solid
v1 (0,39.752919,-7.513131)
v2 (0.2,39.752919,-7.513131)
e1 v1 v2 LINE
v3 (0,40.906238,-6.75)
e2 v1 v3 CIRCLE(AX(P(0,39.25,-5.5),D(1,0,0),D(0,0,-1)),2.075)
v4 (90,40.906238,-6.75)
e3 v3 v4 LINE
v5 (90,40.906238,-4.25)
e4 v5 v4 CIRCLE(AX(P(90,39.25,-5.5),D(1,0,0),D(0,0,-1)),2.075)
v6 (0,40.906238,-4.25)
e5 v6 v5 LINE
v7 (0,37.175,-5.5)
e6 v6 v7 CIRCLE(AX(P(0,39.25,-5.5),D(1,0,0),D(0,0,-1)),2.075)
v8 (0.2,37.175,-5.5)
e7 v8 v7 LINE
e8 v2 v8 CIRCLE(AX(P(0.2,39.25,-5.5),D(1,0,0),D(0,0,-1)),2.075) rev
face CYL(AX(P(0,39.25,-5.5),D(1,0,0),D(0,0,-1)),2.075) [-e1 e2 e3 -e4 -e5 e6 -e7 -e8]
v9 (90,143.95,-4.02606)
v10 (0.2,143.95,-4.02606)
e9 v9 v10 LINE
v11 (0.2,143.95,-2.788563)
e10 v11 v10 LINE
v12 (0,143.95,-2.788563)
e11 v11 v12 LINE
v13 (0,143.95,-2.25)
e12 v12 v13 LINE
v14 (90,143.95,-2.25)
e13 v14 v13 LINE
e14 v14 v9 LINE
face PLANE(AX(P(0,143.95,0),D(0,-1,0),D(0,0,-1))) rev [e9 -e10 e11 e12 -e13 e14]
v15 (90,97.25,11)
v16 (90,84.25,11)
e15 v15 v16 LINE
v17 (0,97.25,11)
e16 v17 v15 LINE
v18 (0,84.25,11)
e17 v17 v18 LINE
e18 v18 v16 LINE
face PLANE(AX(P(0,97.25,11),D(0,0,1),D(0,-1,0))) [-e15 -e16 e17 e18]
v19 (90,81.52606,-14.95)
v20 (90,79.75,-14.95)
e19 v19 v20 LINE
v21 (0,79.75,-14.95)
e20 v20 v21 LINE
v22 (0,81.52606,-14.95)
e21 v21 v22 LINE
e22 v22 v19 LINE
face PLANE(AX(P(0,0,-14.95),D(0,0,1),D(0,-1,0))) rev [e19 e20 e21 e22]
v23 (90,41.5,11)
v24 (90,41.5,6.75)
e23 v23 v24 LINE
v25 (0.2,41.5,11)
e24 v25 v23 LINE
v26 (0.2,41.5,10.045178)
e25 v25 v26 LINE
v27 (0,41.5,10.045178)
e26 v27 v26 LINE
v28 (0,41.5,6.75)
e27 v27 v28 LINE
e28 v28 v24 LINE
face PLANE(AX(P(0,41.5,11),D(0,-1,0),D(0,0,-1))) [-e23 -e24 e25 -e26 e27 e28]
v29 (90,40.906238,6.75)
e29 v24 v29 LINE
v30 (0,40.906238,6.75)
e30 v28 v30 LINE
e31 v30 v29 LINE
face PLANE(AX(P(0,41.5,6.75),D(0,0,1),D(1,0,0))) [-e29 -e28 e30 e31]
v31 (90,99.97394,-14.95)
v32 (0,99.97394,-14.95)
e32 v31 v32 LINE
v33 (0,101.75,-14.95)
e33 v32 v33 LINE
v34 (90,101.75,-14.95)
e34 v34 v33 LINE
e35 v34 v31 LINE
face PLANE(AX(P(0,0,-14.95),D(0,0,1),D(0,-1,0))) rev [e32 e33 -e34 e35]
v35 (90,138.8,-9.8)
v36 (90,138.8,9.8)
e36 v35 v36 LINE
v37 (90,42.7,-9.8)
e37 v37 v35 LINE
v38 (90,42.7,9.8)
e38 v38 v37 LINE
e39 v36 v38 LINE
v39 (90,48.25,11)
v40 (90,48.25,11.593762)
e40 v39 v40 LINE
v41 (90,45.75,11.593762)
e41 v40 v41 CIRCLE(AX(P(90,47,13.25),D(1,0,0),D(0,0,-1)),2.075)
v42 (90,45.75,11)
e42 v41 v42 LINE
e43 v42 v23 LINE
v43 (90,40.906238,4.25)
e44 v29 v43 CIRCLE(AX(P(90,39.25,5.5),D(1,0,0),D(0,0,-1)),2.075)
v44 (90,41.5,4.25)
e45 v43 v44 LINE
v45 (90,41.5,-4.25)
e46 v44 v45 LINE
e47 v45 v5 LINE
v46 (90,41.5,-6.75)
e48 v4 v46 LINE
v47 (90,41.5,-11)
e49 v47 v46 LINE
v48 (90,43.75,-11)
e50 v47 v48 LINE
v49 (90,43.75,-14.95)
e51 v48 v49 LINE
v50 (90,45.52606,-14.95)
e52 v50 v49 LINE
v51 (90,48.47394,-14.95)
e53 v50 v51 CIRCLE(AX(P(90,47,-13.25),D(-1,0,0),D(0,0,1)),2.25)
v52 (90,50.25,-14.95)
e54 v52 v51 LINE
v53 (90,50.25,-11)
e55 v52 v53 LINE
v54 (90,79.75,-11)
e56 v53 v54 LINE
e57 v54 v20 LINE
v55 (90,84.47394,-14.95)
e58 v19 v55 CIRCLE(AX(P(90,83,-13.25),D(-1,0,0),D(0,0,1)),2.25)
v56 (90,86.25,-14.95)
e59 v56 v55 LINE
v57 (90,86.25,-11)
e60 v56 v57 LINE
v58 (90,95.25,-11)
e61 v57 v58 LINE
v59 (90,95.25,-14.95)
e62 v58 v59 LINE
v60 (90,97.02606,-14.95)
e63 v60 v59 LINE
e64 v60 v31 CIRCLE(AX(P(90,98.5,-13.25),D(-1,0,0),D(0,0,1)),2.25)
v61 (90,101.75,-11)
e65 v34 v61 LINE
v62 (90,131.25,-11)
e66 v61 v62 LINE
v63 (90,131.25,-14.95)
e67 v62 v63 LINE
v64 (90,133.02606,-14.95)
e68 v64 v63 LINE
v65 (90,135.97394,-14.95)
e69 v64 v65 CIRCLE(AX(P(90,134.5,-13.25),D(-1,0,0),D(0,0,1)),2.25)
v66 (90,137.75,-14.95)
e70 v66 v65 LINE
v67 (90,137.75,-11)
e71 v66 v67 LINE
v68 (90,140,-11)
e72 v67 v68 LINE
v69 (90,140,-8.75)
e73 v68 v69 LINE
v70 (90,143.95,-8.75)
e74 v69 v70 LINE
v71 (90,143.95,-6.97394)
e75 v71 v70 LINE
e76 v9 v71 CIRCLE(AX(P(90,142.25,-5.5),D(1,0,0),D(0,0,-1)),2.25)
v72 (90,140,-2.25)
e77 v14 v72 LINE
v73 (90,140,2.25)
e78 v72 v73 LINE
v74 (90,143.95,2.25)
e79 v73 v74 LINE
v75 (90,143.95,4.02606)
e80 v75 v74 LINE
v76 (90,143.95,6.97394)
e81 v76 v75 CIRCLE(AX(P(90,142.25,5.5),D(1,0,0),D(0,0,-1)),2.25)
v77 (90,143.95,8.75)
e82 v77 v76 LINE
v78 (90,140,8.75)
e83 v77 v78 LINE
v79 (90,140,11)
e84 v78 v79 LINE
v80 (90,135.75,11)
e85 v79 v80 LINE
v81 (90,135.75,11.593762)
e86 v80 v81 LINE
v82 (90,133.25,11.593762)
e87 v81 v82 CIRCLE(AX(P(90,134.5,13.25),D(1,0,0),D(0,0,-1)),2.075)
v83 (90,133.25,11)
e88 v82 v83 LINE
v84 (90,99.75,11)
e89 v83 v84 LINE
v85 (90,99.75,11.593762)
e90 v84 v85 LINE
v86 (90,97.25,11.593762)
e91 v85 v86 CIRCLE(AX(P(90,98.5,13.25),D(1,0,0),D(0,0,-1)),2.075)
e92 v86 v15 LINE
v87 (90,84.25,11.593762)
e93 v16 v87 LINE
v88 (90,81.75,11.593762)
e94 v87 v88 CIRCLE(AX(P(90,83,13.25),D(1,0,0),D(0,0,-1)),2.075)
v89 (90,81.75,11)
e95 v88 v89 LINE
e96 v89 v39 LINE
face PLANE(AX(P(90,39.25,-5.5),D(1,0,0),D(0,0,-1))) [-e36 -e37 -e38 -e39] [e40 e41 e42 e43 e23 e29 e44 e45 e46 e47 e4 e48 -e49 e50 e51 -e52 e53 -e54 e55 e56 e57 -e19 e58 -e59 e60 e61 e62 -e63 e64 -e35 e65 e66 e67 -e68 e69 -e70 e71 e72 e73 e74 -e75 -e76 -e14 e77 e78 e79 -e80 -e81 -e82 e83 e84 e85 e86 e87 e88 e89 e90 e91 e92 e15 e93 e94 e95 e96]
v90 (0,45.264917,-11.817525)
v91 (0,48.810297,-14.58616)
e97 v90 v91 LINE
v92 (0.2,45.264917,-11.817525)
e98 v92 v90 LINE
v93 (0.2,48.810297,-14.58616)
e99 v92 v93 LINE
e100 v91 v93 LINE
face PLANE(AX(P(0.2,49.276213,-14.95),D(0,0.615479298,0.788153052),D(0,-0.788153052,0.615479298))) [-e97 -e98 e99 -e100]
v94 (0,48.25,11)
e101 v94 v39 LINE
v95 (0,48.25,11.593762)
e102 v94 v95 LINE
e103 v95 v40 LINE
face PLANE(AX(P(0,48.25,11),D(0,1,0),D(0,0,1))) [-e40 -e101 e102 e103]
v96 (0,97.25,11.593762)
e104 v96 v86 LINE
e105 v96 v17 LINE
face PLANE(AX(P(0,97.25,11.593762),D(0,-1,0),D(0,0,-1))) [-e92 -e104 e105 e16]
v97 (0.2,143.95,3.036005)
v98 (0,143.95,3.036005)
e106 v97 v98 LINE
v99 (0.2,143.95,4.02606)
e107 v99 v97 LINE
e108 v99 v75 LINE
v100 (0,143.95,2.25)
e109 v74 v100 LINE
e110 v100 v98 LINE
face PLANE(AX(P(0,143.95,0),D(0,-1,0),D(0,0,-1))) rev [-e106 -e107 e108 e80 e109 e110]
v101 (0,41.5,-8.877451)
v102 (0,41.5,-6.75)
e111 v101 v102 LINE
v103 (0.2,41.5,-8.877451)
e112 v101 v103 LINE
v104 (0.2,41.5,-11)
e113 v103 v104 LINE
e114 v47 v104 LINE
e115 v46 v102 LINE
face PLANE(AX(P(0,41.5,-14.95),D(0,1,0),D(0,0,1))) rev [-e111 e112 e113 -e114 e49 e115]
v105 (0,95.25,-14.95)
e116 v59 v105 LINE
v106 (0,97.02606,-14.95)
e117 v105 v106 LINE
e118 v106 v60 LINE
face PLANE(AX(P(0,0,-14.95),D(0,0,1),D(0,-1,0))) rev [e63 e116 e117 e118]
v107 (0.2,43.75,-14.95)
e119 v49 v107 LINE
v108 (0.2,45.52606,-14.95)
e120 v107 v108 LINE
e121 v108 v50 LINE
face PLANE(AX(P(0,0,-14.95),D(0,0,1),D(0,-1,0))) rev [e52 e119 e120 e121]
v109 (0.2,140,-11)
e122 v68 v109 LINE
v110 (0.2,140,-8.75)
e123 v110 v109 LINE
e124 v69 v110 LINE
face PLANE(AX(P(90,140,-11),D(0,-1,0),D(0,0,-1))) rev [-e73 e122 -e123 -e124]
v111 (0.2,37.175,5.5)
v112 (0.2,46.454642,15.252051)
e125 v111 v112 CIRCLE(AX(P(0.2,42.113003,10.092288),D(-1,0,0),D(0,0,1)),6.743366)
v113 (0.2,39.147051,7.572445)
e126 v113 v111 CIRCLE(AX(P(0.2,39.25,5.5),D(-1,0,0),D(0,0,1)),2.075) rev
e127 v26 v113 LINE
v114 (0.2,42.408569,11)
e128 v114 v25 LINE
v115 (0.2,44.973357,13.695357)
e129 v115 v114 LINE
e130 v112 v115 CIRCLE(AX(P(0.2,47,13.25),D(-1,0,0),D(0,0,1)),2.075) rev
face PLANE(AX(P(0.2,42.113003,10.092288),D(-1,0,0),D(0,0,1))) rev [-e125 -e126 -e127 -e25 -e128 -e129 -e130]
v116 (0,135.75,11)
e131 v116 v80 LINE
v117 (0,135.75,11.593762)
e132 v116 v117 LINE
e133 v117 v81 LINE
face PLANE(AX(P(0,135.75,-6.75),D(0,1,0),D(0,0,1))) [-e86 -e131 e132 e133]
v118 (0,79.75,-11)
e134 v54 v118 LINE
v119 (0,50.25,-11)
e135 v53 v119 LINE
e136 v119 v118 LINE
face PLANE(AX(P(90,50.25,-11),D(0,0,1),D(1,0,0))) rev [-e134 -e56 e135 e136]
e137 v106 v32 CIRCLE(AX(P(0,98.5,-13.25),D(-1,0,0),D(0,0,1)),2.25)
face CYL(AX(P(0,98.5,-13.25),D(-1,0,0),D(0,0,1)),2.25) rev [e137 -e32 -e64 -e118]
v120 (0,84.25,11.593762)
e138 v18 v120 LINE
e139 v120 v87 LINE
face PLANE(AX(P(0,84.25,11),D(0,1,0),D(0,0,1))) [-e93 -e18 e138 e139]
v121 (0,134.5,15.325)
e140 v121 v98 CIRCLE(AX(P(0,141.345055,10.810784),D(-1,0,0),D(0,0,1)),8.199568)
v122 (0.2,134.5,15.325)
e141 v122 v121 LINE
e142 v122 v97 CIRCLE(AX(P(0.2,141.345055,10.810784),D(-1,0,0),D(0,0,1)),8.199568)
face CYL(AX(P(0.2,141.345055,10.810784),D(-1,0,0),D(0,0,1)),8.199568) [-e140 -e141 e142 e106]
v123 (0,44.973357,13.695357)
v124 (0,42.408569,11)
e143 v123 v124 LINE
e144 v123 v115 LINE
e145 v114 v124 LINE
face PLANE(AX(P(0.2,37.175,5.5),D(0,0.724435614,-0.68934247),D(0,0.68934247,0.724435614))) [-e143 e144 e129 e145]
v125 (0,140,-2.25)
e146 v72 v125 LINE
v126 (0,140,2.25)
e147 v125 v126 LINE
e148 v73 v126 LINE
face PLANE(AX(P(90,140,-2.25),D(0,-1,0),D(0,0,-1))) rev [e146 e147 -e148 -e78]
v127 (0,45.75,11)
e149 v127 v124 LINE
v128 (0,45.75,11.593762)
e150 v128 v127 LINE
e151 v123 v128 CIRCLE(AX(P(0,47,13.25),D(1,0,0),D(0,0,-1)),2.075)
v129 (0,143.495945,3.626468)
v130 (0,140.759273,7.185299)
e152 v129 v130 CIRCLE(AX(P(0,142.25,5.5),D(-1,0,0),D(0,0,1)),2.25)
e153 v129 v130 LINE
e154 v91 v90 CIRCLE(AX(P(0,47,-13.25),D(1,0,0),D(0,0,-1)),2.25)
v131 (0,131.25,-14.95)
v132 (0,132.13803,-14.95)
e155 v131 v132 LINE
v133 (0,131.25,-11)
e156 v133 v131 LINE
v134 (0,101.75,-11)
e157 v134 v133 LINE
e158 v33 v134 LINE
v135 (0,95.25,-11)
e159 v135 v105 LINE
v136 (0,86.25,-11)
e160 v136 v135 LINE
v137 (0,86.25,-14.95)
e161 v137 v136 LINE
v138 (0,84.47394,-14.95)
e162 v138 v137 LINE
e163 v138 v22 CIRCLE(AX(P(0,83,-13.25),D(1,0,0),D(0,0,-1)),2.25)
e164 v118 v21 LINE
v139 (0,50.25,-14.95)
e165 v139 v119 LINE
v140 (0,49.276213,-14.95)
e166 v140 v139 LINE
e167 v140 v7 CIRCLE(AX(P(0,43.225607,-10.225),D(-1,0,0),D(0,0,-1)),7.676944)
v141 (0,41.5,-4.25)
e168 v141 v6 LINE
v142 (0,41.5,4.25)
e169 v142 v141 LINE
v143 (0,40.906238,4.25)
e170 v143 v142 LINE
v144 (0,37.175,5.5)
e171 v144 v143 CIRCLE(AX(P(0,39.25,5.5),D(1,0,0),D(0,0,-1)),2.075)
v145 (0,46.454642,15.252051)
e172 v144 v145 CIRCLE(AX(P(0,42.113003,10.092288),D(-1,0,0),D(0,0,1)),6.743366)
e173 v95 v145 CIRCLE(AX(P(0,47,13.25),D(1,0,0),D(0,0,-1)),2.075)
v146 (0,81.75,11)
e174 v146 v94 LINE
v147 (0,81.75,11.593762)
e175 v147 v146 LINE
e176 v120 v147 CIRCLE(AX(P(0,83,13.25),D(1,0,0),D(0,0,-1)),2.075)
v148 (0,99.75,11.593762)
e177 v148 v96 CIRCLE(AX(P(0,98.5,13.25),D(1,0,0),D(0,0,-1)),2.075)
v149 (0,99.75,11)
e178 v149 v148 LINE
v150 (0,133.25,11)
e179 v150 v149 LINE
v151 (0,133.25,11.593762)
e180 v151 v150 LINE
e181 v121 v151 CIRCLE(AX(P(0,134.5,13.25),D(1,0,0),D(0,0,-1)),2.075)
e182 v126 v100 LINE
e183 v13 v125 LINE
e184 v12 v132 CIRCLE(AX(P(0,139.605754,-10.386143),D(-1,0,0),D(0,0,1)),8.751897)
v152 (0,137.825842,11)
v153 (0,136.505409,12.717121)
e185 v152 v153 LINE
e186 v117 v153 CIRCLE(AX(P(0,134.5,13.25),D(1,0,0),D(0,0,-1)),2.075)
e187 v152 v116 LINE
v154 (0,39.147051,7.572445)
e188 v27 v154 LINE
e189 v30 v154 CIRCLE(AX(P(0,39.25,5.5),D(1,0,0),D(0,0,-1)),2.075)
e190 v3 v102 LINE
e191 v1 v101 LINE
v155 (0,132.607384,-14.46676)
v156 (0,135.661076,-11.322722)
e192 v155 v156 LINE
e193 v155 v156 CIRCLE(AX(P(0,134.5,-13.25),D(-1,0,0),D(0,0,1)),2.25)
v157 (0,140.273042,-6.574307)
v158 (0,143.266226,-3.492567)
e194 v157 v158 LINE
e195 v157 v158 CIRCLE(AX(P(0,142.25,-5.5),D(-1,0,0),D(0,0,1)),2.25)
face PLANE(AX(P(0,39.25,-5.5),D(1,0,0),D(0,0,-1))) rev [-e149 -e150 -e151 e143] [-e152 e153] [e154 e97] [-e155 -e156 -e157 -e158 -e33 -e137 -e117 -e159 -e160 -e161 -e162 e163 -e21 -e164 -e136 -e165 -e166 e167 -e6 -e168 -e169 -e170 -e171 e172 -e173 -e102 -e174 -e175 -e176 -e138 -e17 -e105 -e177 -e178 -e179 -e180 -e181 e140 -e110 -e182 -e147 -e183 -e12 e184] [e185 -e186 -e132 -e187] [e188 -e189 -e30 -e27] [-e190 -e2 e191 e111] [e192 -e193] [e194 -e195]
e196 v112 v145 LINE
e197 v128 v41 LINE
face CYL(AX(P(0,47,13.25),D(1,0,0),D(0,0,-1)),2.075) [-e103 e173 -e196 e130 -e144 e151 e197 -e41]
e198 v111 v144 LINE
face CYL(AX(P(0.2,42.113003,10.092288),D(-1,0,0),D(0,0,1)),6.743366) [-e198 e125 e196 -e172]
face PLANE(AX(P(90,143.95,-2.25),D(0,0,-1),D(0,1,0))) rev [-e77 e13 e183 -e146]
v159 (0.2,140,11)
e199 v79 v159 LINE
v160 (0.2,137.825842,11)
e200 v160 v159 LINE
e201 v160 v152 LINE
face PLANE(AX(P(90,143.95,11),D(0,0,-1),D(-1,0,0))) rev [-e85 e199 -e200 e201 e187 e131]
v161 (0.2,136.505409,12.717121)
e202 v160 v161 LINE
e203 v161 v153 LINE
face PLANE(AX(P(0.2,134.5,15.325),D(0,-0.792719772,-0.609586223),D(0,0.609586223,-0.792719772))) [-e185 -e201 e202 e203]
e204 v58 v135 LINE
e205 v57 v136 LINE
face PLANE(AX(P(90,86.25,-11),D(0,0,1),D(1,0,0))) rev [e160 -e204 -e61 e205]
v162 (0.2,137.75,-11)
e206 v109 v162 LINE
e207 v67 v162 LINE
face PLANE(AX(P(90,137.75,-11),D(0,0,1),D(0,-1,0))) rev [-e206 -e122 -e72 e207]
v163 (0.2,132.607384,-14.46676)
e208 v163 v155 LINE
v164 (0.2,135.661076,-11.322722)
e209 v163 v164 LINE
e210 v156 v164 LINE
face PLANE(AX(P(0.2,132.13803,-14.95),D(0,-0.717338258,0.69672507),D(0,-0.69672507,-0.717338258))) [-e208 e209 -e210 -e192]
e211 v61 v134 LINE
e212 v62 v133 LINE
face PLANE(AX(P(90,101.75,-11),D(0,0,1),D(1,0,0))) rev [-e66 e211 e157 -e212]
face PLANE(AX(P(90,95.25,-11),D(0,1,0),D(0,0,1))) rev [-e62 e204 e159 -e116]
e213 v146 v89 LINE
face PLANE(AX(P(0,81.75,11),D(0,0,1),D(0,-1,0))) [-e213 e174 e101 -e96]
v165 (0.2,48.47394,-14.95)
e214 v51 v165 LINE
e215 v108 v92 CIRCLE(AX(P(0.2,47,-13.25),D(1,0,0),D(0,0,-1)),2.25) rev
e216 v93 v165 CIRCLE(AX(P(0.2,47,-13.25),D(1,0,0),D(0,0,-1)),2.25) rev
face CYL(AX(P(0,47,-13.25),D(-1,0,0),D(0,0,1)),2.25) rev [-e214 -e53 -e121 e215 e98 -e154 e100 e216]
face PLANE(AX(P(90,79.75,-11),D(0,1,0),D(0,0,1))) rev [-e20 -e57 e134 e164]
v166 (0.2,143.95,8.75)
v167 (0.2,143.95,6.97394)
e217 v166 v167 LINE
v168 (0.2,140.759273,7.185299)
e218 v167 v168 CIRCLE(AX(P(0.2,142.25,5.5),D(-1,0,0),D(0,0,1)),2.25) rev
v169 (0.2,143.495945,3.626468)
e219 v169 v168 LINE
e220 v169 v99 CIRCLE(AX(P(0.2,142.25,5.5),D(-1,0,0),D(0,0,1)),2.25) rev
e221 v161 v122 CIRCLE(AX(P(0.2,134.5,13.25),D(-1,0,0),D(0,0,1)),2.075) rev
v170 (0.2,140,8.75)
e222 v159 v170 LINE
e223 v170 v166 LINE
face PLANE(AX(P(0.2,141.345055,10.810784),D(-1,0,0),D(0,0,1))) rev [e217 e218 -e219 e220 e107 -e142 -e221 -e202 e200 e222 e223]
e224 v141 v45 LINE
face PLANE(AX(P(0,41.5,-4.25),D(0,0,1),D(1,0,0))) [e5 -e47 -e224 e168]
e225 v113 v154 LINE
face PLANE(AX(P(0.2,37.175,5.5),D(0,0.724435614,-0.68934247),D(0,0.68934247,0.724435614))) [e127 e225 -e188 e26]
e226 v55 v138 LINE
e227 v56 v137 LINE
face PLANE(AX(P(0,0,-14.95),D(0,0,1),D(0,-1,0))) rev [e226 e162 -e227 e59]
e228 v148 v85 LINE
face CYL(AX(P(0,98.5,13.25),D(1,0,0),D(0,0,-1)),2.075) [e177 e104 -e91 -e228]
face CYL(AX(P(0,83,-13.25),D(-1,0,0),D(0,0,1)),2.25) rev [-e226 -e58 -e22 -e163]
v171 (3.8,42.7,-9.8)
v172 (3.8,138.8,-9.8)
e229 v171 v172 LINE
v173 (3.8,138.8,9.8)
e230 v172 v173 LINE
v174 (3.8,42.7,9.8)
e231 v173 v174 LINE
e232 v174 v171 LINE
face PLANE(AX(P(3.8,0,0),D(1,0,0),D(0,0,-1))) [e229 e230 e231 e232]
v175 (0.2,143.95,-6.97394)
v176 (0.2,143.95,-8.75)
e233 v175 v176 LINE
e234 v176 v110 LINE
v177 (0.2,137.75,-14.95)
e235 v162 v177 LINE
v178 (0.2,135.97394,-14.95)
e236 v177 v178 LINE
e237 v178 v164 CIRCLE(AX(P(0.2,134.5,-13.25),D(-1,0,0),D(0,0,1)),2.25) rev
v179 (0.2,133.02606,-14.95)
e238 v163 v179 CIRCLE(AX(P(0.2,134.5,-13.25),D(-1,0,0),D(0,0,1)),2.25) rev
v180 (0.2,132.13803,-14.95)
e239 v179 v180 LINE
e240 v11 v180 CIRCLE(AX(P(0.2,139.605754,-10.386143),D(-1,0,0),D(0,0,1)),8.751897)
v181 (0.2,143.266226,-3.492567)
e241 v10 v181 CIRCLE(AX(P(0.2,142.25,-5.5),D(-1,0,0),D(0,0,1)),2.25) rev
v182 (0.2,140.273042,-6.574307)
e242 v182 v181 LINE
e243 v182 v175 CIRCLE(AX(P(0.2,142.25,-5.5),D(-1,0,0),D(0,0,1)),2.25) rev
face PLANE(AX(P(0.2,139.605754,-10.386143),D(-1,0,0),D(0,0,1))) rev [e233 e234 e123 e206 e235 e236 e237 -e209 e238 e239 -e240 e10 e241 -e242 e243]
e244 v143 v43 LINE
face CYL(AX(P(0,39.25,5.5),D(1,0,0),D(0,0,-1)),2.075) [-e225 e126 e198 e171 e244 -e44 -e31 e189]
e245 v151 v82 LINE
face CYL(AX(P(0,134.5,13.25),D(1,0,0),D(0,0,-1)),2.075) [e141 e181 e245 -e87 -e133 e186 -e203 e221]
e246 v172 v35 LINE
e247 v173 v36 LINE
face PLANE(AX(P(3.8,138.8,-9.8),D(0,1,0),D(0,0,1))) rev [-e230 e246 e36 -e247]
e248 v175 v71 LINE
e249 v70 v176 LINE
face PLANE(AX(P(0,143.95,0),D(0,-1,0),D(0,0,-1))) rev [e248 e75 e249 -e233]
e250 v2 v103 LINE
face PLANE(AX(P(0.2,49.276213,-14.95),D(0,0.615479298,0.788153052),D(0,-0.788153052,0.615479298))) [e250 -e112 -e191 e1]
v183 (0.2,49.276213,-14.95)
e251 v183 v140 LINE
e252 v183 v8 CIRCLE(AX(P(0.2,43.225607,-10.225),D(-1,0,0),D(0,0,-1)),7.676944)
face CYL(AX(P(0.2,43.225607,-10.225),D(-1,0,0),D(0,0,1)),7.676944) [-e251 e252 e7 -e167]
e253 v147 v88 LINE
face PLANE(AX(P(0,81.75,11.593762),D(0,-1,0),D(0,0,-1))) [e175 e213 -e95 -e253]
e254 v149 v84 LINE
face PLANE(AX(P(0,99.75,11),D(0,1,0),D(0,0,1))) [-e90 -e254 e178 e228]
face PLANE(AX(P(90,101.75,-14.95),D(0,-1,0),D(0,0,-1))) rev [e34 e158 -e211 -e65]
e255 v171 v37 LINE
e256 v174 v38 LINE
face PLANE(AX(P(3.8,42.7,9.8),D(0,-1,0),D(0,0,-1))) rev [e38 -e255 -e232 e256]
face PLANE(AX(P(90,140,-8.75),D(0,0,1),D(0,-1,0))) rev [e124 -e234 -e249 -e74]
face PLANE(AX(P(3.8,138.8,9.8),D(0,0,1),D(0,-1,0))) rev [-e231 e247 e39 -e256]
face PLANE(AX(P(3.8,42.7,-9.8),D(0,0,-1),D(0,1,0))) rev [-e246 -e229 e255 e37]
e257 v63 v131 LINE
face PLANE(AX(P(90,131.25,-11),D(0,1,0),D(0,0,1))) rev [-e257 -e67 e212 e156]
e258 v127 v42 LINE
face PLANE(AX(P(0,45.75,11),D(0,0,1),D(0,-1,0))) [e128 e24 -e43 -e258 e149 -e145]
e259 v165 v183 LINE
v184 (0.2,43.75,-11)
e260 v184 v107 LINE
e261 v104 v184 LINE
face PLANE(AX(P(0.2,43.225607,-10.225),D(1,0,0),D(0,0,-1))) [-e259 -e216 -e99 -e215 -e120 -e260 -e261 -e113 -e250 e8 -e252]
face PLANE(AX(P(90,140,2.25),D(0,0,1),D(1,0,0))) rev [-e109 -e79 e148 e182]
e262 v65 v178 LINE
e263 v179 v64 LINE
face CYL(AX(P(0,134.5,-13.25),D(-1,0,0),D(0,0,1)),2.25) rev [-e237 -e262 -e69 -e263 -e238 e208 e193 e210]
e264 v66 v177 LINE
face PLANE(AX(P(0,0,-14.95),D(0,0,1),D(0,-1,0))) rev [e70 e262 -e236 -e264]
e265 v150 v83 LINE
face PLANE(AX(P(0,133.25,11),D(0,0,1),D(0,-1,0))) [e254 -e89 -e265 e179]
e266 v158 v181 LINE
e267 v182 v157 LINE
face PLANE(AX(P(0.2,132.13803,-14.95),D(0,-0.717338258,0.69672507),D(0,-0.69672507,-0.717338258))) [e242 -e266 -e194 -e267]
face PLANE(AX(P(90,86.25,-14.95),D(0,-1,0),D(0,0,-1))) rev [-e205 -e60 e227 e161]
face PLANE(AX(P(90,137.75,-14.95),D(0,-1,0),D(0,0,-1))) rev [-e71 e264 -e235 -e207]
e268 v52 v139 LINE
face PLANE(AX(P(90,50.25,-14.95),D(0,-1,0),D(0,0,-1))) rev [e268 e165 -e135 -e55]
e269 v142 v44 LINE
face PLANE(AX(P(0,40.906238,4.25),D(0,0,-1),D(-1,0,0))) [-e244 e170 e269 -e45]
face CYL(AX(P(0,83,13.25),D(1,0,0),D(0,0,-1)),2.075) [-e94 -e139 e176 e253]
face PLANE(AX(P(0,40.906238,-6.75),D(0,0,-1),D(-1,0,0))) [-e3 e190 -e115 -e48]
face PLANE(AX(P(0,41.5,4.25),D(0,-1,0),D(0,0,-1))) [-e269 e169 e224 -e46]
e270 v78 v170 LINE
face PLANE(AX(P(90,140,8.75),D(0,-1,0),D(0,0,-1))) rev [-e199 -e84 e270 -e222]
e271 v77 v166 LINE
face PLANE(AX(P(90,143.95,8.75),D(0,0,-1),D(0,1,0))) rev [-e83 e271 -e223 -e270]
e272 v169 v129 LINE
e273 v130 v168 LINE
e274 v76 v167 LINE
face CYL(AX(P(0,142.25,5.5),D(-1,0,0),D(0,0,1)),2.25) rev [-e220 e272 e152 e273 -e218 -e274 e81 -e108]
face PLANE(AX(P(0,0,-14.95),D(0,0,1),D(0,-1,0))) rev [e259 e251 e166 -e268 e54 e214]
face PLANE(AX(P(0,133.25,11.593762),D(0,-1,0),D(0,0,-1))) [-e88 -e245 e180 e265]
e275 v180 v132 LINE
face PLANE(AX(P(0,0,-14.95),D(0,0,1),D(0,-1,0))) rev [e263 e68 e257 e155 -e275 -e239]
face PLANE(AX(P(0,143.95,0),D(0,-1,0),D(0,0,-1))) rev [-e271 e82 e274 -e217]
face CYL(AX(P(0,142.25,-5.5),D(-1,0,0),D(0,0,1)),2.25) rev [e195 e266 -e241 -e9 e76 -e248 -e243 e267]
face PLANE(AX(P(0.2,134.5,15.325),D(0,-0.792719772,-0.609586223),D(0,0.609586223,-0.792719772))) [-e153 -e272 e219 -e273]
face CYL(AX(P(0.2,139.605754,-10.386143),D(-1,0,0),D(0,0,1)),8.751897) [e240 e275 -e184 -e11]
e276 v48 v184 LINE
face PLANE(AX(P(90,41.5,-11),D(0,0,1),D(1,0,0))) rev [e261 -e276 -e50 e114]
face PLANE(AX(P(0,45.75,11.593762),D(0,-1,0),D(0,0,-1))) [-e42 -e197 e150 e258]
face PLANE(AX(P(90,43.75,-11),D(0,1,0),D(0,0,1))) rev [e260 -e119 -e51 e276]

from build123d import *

# Parameters (mm, degrees)
EXTRUDE_1_DEPTH     = 90
SKETCH_2_W          = 90
SKETCH_2_H          = 17.75
EXTRUDE_2_DEPTH     = 8.2
SKETCH_3_W          = 90
SKETCH_3_H          = 102.45
EXTRUDE_3_DEPTH     = 8.2
SKETCH_4_W          = 3.95
SKETCH_4_H          = 2.25
CUT_EXTRUDE_1_DEPTH = 171.45954982
SKETCH_5_W          = 3.95
SKETCH_5_H          = 29.5
CUT_EXTRUDE_2_DEPTH = 171.45954982
SKETCH_6_W          = 3.95
SKETCH_6_H          = 9
CUT_EXTRUDE_3_DEPTH = 171.45954982
SKETCH_7_W          = 3.95
SKETCH_7_H          = 29.5
CUT_EXTRUDE_4_DEPTH = 171.45954982
SKETCH_8_W          = 3.95
SKETCH_8_H          = 6.2
CUT_EXTRUDE_5_DEPTH = 171.45954982
SKETCH_9_W          = 2.25
SKETCH_9_H          = 3.95
CUT_EXTRUDE_6_DEPTH = 171.45954982
SKETCH_10_W         = 4.5
SKETCH_10_H         = 3.95
CUT_EXTRUDE_7_DEPTH = 171.45954982
SKETCH_11_W         = 2.25
SKETCH_11_H         = 3.95
CUT_EXTRUDE_8_DEPTH = 171.45954982
SKETCH_12_W         = 19.6
SKETCH_12_H         = 96.1
CUT_EXTRUDE_9_DEPTH = 86.2
EXTRUDE_START       = -90
EXTRUDE_5_DEPTH     = 90
EXTRUDE_6_DEPTH     = 0.2


# Read off the part's stored shape, not the designer's step: Бобышка-Вытянуть5
with BuildPart() as part:
    # Эскиз1 → Бобышка-Вытянуть1 (new body)
    with BuildSketch(Plane(origin=(90, 0, 0), x_dir=(0, 0, -1), z_dir=(1, 0, 0))):
        with BuildLine():
            Line((6.75, 40.906238208), (6.75, 135.75))
            Line((6.75, 135.75), (-11.593761792, 135.75))
            ThreePointArc((-11.593761792, 135.75), (-15.325, 134.5), (-11.593761793, 133.25))
            Line((-11.593761793, 133.25), (-11, 133.25))
            Line((-11, 133.25), (-11, 99.75))
            Line((-11, 99.75), (-11.593761792, 99.75))
            ThreePointArc((-11.593761792, 99.75), (-15.325, 98.5), (-11.593761792, 97.25))
            Line((-11.593761792, 97.25), (-11, 97.25))
            Line((-11, 97.25), (-11, 84.25))
            Line((-11, 84.25), (-11.593761792, 84.25))
            ThreePointArc((-11.593761792, 84.25), (-15.325, 83), (-11.593761792, 81.75))
            Line((-11.593761792, 81.75), (-11, 81.75))
            Line((-11, 81.75), (-11, 48.25))
            Line((-11, 48.25), (-11.593761792, 48.25))
            ThreePointArc((-11.593761792, 48.25), (-15.325, 47), (-11.593761792, 45.75))
            Line((-11.593761792, 45.75), (-11, 45.75))
            Line((-11, 45.75), (-11, 41.5))
            Line((-11, 41.5), (-6.75, 41.5))
            Line((-6.75, 41.5), (-6.75, 40.906238208))
            ThreePointArc((-6.75, 40.906238208), (-5.5, 37.175), (-4.25, 40.906238208))
            Line((-4.25, 40.906238208), (-4.25, 41.5))
            Line((-4.25, 41.5), (4.25, 41.5))
            Line((4.25, 41.5), (4.25, 40.906238208))
            ThreePointArc((4.25, 40.906238208), (5.5, 37.175), (6.75, 40.906238208))
        make_face()
    extrude(amount=-EXTRUDE_1_DEPTH)

    # Эскиз2 → Бобышка-Вытянуть2 (add)
    with BuildSketch(Plane(origin=(0, 135.75, 0), x_dir=(-1, 0, 0), z_dir=(0, 1, 0))):
        with Locations((-45, 2.125)):
            Rectangle(SKETCH_2_W, SKETCH_2_H)
    extrude(amount=EXTRUDE_2_DEPTH)

    # Эскиз3 → Бобышка-Вытянуть3 (add)
    with BuildSketch(Plane(origin=(0, 0, -6.75), x_dir=(-1, 0, 0), z_dir=(0, 0, -1))):
        with Locations((-45, 92.725)):
            Rectangle(SKETCH_3_W, SKETCH_3_H)
    extrude(amount=EXTRUDE_3_DEPTH)

    # Эскиз4 → Вырез-Вытянуть1 (cut, through all)
    with BuildSketch(Plane.ZY):
        with Locations((-12.975, 42.625)):
            Rectangle(SKETCH_4_W, SKETCH_4_H)
    extrude(amount=-CUT_EXTRUDE_1_DEPTH, mode=Mode.SUBTRACT)

    # Эскиз5 → Вырез-Вытянуть2 (cut, through all)
    with BuildSketch(Plane.ZY):
        with Locations((-12.975, 65)):
            Rectangle(SKETCH_5_W, SKETCH_5_H)
    extrude(amount=-CUT_EXTRUDE_2_DEPTH, mode=Mode.SUBTRACT)

    # Эскиз6 → Вырез-Вытянуть3 (cut, through all)
    with BuildSketch(Plane.ZY):
        with Locations((-12.975, 90.75)):
            Rectangle(SKETCH_6_W, SKETCH_6_H)
    extrude(amount=-CUT_EXTRUDE_3_DEPTH, mode=Mode.SUBTRACT)

    # Эскиз7 → Вырез-Вытянуть4 (cut, through all)
    with BuildSketch(Plane.ZY):
        with Locations((-12.975, 116.5)):
            Rectangle(SKETCH_7_W, SKETCH_7_H)
    extrude(amount=-CUT_EXTRUDE_4_DEPTH, mode=Mode.SUBTRACT)

    # Эскиз8 → Вырез-Вытянуть5 (cut, through all)
    with BuildSketch(Plane.ZY):
        with Locations((-12.975, 140.85)):
            Rectangle(SKETCH_8_W, SKETCH_8_H)
    extrude(amount=-CUT_EXTRUDE_5_DEPTH, mode=Mode.SUBTRACT)

    # Эскиз9 → Вырез-Вытянуть6 (cut, through all)
    with BuildSketch(Plane.ZY):
        with Locations((-9.875, 141.975)):
            Rectangle(SKETCH_9_W, SKETCH_9_H)
    extrude(amount=-CUT_EXTRUDE_6_DEPTH, mode=Mode.SUBTRACT)

    # Эскиз10 → Вырез-Вытянуть7 (cut, through all)
    with BuildSketch(Plane.ZY):
        with Locations((0, 141.975)):
            Rectangle(SKETCH_10_W, SKETCH_10_H)
    extrude(amount=-CUT_EXTRUDE_7_DEPTH, mode=Mode.SUBTRACT)

    # Эскиз11 → Вырез-Вытянуть8 (cut, through all)
    with BuildSketch(Plane.ZY):
        with Locations((9.875, 141.975)):
            Rectangle(SKETCH_11_W, SKETCH_11_H)
    extrude(amount=-CUT_EXTRUDE_8_DEPTH, mode=Mode.SUBTRACT)

    # Эскиз12 → Вырез-Вытянуть9 (cut)
    with BuildSketch(Plane(origin=(90, 0, 0), x_dir=(0, 0, -1), z_dir=(1, 0, 0))):
        with Locations((0, 90.75)):
            Rectangle(SKETCH_12_W, SKETCH_12_H)
    extrude(amount=-CUT_EXTRUDE_9_DEPTH, mode=Mode.SUBTRACT)

    # Бобышка-Вытянуть5 outline → Бобышка-Вытянуть5 (cut)
    with BuildSketch(Plane(origin=(90, 0, 0), x_dir=(0, 0, -1), z_dir=(1, 0, 0)).offset(EXTRUDE_START)):
        with BuildLine():
            ThreePointArc((-6.973940297, 143.95), (-5.5, 140), (-4.026059703, 143.95))
            Line((-4.026059703, 143.95), (-6.973940297, 143.95))
        make_face()
        with BuildLine():
            ThreePointArc((4.026059703, 143.95), (5.5, 140), (6.973940297, 143.95))
            Line((6.973940297, 143.95), (4.026059703, 143.95))
        make_face()
        with BuildLine():
            ThreePointArc((14.95, 135.973940297), (11, 134.5), (14.95, 133.026059703))
            Line((14.95, 133.026059703), (14.95, 135.973940297))
        make_face()
        with BuildLine():
            ThreePointArc((14.95, 99.973940297), (11, 98.5), (14.95, 97.026059703))
            Line((14.95, 97.026059703), (14.95, 99.973940297))
        make_face()
        with BuildLine():
            ThreePointArc((14.95, 84.473940297), (11, 83), (14.95, 81.526059703))
            Line((14.95, 81.526059703), (14.95, 84.473940297))
        make_face()
        with BuildLine():
            ThreePointArc((14.95, 48.473940297), (11, 47), (14.95, 45.526059703))
            Line((14.95, 45.526059703), (14.95, 48.473940297))
        make_face()
    extrude(amount=EXTRUDE_5_DEPTH, mode=Mode.SUBTRACT)

    # Эскиз21 → Бобышка-Вытянуть6 (add)
    with BuildSketch(Plane.ZY):
        with BuildLine():
            Line((-14.95, 49.276213414), (-5.5, 37.175))
            ThreePointArc((-5.5, 37.175), (-16.275606707, 38.500606707), (-14.95, 49.276213414))
        make_face()
        with BuildLine():
            Line((5.5, 37.175), (15.252051369, 46.45464203))
            ThreePointArc((15.252051369, 46.45464203), (14.740776792, 37.227868536), (5.5, 37.175))
        make_face()
        with BuildLine():
            Line((-14.95, 132.138029851), (-2.788562926, 143.95))
            ThreePointArc((-2.788562926, 143.95), (-16.483808441, 145.883823994), (-14.95, 132.138029851))
        make_face()
        with BuildLine():
            Line((15.325, 134.5), (3.036005332, 143.95))
            ThreePointArc((3.036005332, 143.95), (15.809128056, 147.845015034), (15.325, 134.5))
        make_face()
    extrude(amount=-EXTRUDE_6_DEPTH)


solid = part.part
